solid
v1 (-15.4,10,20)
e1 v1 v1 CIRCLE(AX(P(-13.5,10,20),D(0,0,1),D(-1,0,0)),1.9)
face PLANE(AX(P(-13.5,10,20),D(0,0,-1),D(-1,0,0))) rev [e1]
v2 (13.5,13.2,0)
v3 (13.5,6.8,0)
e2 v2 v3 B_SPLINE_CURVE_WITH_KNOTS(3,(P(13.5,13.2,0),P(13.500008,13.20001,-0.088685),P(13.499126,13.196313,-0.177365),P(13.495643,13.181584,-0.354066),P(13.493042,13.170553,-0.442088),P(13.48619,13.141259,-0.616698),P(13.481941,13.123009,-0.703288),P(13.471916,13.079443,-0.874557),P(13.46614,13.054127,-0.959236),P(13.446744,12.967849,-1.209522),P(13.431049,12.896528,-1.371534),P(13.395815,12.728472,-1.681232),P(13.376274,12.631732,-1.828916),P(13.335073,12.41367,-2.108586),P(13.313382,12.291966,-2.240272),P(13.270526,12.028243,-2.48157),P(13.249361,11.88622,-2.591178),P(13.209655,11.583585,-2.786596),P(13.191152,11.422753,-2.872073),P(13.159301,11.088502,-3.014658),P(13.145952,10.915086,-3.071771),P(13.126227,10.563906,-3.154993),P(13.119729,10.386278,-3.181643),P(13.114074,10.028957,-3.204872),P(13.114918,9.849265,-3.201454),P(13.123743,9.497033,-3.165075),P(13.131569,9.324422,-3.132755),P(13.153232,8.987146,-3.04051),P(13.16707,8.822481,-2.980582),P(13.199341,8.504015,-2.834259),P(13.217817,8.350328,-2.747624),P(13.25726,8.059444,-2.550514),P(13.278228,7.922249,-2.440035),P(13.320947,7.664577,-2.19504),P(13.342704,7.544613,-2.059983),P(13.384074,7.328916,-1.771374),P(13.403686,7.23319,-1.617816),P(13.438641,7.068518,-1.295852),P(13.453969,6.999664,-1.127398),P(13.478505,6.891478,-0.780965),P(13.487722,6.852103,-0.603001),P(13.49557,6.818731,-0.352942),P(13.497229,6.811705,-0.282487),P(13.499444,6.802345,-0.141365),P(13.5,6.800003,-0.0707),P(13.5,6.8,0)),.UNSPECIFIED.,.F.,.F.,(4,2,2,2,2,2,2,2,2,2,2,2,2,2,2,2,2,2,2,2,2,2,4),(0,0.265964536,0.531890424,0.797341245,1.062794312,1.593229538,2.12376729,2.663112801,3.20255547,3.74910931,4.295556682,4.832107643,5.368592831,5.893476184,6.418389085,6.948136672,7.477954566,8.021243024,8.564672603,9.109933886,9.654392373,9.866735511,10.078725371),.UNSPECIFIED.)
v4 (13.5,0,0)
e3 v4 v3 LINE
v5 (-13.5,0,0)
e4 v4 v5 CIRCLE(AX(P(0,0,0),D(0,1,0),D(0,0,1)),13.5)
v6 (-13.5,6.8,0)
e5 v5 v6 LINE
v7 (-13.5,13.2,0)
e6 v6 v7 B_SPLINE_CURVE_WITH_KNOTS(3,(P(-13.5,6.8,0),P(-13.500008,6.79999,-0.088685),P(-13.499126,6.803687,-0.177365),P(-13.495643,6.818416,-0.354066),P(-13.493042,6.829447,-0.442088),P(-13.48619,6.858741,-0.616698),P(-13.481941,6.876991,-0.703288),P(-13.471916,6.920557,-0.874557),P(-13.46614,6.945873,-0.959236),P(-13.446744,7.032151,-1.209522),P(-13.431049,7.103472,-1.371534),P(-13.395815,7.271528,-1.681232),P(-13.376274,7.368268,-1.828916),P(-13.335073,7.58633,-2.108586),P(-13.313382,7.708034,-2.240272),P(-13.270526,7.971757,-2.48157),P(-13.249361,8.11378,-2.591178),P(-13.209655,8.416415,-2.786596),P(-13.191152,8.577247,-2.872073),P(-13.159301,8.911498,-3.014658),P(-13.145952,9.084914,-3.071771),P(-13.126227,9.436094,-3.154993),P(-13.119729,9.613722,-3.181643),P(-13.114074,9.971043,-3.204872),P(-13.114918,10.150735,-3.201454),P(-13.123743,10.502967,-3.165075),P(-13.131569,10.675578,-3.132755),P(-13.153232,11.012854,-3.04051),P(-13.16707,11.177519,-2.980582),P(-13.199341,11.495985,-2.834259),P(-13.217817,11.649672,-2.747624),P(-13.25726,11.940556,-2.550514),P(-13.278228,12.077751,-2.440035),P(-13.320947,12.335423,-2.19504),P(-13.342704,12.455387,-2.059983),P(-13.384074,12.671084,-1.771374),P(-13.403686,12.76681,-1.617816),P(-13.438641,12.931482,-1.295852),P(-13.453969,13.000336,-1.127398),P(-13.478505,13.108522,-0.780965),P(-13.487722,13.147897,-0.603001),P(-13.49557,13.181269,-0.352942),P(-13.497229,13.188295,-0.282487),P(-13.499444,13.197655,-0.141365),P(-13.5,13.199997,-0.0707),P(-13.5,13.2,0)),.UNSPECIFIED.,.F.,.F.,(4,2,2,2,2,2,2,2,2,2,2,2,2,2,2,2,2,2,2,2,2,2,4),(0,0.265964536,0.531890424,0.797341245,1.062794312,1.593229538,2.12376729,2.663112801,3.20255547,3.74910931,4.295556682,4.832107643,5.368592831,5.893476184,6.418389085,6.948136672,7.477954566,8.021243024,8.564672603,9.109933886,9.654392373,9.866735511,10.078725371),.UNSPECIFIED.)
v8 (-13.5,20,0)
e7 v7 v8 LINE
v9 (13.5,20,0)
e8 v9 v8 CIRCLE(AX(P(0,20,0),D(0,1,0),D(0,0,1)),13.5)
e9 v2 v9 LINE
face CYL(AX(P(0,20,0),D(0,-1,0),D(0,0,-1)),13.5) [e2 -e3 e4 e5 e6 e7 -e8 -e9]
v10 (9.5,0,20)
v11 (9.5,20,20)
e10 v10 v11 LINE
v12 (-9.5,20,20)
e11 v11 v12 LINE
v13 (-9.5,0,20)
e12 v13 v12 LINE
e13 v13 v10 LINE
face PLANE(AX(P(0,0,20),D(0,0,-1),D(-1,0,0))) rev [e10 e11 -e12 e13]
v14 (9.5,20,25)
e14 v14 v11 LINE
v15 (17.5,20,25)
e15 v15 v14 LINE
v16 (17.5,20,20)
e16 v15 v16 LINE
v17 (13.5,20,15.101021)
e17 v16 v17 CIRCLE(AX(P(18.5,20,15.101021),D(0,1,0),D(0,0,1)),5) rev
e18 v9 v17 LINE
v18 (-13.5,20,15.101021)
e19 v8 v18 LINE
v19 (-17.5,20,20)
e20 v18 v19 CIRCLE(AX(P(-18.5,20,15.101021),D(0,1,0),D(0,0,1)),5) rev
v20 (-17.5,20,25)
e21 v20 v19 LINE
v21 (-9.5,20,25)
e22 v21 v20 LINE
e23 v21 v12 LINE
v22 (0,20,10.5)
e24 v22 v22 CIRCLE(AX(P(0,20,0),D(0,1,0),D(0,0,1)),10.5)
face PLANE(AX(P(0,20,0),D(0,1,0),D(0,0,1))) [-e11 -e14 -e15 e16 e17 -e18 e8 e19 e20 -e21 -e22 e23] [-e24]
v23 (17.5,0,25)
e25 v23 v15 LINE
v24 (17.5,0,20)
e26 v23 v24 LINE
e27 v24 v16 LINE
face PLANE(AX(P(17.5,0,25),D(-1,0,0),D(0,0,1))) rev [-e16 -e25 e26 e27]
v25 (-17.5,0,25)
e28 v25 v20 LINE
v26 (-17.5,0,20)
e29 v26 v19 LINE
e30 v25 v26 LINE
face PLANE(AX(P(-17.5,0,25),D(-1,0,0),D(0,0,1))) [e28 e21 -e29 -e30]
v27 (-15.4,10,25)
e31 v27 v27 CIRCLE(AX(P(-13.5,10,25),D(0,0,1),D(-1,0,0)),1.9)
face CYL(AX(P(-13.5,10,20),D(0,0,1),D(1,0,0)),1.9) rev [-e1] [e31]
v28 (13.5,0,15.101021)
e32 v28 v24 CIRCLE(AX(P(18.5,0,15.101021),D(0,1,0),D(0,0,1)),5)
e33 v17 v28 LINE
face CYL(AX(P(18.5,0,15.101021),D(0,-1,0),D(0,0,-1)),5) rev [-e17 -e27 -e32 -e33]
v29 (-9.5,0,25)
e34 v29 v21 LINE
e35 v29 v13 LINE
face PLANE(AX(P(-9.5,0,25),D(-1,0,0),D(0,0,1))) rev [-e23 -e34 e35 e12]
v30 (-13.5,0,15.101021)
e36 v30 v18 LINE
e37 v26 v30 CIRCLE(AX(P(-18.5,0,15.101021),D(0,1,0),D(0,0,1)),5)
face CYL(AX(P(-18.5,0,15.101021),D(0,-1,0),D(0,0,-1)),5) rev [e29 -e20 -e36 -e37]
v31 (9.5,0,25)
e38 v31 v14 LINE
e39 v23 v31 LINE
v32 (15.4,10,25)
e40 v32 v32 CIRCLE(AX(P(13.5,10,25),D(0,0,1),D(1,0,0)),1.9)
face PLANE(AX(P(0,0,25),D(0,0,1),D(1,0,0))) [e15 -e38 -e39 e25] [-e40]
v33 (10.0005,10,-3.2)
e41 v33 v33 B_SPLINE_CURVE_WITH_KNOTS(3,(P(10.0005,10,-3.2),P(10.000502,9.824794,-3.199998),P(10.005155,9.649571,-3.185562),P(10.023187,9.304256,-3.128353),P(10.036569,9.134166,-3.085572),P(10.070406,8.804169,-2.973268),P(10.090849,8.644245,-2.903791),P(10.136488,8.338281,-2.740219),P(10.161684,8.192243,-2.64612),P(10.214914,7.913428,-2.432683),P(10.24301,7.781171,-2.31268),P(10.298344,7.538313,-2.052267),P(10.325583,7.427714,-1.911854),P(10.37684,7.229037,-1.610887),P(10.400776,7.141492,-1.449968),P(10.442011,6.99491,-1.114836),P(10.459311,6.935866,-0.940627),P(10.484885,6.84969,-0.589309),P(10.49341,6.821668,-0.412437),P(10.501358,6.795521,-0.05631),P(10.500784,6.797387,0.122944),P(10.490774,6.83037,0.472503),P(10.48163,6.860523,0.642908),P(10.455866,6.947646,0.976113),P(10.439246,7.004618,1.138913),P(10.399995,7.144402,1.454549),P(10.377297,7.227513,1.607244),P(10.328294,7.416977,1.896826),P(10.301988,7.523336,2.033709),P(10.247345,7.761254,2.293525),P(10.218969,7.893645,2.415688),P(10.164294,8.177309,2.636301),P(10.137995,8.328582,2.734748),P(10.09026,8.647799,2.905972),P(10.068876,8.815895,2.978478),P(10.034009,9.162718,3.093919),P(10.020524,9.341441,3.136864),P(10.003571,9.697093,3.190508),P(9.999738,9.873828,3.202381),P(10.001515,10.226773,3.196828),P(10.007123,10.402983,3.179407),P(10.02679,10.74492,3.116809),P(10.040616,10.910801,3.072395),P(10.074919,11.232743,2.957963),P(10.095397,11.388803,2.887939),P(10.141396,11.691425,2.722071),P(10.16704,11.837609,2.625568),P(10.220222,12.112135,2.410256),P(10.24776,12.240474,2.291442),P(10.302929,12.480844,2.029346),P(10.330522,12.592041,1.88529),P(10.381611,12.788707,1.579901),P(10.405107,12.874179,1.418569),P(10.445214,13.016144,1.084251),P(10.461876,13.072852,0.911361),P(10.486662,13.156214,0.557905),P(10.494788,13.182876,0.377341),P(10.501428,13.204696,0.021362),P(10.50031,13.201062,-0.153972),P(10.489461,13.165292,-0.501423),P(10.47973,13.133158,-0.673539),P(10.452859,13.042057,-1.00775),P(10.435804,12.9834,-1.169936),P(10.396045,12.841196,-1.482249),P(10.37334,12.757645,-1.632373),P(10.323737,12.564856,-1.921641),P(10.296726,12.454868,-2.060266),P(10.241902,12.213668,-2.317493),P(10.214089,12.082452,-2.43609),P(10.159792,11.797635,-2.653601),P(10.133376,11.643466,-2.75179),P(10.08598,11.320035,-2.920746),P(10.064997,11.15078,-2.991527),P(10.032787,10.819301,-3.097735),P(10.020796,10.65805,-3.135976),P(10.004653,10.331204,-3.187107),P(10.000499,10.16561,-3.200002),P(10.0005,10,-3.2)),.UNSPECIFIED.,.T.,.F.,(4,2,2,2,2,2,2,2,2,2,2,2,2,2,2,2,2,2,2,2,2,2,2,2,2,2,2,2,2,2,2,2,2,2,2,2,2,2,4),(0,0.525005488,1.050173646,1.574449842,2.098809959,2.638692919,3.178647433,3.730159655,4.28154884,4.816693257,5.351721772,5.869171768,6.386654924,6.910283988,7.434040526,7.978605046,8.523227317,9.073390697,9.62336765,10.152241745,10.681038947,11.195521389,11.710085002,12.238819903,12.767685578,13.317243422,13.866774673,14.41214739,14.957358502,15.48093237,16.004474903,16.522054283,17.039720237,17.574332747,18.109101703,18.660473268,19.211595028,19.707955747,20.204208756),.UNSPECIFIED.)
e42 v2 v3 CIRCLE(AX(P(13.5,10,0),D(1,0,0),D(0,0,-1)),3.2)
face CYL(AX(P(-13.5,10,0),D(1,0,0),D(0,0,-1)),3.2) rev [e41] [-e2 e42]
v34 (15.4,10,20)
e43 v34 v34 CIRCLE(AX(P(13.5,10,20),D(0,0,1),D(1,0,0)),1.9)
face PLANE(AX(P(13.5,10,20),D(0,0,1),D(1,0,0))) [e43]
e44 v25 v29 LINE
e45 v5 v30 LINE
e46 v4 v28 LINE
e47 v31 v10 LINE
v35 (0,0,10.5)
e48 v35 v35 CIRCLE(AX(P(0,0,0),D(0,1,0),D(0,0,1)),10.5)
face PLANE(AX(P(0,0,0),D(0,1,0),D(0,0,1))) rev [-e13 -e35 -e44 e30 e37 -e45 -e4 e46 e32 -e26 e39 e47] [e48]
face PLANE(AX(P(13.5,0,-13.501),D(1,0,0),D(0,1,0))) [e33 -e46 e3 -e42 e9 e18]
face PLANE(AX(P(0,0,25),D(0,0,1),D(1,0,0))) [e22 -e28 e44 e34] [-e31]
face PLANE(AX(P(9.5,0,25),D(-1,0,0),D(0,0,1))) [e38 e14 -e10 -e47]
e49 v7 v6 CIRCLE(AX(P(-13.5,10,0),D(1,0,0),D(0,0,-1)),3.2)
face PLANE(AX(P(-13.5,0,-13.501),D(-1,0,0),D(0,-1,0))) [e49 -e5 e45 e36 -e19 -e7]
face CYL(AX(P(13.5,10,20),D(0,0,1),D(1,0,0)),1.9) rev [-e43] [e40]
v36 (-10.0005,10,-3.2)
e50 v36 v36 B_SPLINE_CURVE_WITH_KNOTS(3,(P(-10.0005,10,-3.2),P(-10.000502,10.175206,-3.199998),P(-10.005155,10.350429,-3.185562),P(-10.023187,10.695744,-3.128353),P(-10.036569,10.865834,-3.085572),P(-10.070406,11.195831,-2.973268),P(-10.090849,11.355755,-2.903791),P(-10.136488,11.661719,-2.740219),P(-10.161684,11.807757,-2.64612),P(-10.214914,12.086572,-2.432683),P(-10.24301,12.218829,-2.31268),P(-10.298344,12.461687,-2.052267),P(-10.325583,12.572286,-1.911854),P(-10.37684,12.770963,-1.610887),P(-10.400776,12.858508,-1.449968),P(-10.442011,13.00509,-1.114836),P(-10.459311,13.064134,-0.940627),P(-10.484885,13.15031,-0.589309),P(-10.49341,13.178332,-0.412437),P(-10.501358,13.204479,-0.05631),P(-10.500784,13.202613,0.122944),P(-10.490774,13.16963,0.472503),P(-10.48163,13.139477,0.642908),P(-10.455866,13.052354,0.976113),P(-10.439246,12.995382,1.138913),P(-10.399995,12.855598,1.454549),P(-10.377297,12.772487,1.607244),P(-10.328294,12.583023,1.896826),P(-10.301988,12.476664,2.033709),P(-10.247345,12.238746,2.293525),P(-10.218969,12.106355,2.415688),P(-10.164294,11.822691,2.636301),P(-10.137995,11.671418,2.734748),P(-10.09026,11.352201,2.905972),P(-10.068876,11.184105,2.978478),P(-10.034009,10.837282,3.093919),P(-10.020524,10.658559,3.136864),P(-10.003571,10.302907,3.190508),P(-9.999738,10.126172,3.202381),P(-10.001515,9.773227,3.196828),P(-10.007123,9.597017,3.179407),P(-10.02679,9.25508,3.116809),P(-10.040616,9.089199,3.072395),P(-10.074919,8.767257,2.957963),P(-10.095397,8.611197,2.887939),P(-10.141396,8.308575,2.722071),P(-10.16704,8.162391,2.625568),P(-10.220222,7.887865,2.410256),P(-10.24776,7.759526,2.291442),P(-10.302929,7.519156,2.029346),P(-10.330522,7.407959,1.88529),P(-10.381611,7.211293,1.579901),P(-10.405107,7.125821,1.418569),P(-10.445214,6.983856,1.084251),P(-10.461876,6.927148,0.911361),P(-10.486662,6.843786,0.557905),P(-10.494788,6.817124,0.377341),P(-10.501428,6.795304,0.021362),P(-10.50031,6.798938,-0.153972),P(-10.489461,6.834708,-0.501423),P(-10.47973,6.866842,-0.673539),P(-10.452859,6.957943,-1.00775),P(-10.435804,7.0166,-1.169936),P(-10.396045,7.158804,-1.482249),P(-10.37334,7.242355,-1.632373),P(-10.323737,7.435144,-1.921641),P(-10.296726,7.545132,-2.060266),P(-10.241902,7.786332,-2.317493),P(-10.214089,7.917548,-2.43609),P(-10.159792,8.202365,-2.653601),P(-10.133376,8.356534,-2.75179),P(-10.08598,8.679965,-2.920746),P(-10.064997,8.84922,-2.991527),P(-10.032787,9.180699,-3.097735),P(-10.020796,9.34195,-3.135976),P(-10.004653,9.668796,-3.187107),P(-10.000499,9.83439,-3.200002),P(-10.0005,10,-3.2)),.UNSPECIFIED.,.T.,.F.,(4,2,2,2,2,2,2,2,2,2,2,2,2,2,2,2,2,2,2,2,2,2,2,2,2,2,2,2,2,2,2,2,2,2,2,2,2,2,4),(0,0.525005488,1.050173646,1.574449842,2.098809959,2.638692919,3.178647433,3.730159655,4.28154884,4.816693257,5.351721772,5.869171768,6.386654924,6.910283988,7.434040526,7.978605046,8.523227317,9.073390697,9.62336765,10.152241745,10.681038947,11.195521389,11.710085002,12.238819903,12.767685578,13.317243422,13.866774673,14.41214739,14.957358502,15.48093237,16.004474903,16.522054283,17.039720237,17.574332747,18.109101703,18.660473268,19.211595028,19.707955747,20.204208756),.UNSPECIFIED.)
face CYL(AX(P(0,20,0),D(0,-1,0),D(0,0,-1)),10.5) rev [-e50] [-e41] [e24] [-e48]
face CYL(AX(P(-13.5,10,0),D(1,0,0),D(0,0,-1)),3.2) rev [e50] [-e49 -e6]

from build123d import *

# Parameters (mm, degrees)
SKETCH_1_R               = 13.5
SKETCH_1_R_2             = 10.5
EXTRUDE_1_DEPTH          = 20
EXTRUDE_2_REACH          = 43.286
EXTRUDE_2_END_RADIUS     = 13.5
SKETCH_5_W               = 27
SKETCH_5_H               = 20
CUT_EXTRUDE_2_DEPTH      = 32.340867888
CUT_EXTRUDE_2_DEPTH_BACK = 32.340867888
SKETCH_2_R               = 3.2
SKETCH_6_W               = 4
SKETCH_6_H               = 20
EXTRUDE_4_DEPTH          = 5
FILLET_1_R               = 5
SKETCH_7_R               = 1.9
CUT_EXTRUDE_3_DEPTH      = 5


with BuildPart() as part:
    # 草图1 → 凸台-拉伸1 (new body)
    with BuildSketch(Plane(origin=(0, 0, 0), x_dir=(1, 0, 0), z_dir=(0, 1, 0))):
        with Locations(Location((0, 0, 0), (0, 0, 270))):
            Circle(SKETCH_1_R)
        with Locations(Location((0, 0, 0), (0, 0, 270))):
            Circle(SKETCH_1_R_2, mode=Mode.SUBTRACT)
    extrude(amount=EXTRUDE_1_DEPTH)

    # 凸台-拉伸2: up to this cylinder (the profile starts outside it)
    extrude_2_end = Plane(origin=(0, 10, 0), z_dir=(0, -1, 0)) * Cylinder(EXTRUDE_2_END_RADIUS, 114.572, mode=Mode.PRIVATE)
    # 草图5 → 凸台-拉伸2 (add, up to the surface)
    with BuildSketch(Plane.XY.offset(20), mode=Mode.PRIVATE) as extrude_2_sk1:
        with Locations((0, 10)):
            Rectangle(SKETCH_5_W, SKETCH_5_H)
    extrude_2_tool1 = extrude(extrude_2_sk1.sketch, amount=-EXTRUDE_2_REACH, mode=Mode.PRIVATE) - extrude_2_end
    add(extrude_2_tool1.solids().sort_by_distance((0, 10, 20))[0])

    # 草图2 → 切除-拉伸2 (cut, two sides: drawn at the far end of the back side and taken through both)
    with BuildSketch(Plane(origin=(0, 0, 0), x_dir=(0, 0, -1), z_dir=(1, 0, 0)).offset(-CUT_EXTRUDE_2_DEPTH_BACK)):
        with Locations((0, 10)):
            Circle(SKETCH_2_R)
    extrude(amount=CUT_EXTRUDE_2_DEPTH + CUT_EXTRUDE_2_DEPTH_BACK, mode=Mode.SUBTRACT)

    # 草图6 → 凸台-拉伸4 (add)
    with BuildSketch(Plane.XY.offset(20)):
        with Locations((15.5, 10)):
            Rectangle(SKETCH_6_W, SKETCH_6_H)
        with Locations((11.5, 10)):
            Rectangle(SKETCH_6_W, SKETCH_6_H)
        with Locations((-11.5, 10)):
            Rectangle(SKETCH_6_W, SKETCH_6_H)
        with Locations((-15.5, 10)):
            Rectangle(SKETCH_6_W, SKETCH_6_H)
    extrude(amount=EXTRUDE_4_DEPTH)

    # 圆角1
    # the kernel refuses this fillet: 5 mm, written as the material it adds along each edge
    with BuildSketch(Plane(origin=(13.5, 20, 20), x_dir=(0, 0, -1), z_dir=(0, -1, 0)), Plane(origin=(-13.5, 0, 20), x_dir=(0, 0, -1), z_dir=(0, 1, 0))) as fillet_1_piece_1:
        with BuildLine():
            CenterArc((4.898979486, 5), FILLET_1_R, 191.536959033, 78.463040967)
            Line((0, 4), (-0.09797959, 3.98))
            ThreePointArc((-0.09797959, 3.98), (-0.1, 2), (-0.1, 0))
            Line((-0.1, 0), (0, -0.1))
            Line((0, -0.1), (4.898979486, -0.1))
            Line((4.898979486, -0.1), (4.898979486, 0))
        make_face()
    extrude(amount=20)

    # 草图7 → 切除-拉伸3 (cut)
    with BuildSketch(Plane.XY.offset(25)):
        with Locations((13.5, 10)):
            Circle(SKETCH_7_R)
        with Locations(Location((-13.5, 10, 0), (0, 0, 180))):
            Circle(SKETCH_7_R)
    extrude(amount=-CUT_EXTRUDE_3_DEPTH, mode=Mode.SUBTRACT)


solid = part.part
